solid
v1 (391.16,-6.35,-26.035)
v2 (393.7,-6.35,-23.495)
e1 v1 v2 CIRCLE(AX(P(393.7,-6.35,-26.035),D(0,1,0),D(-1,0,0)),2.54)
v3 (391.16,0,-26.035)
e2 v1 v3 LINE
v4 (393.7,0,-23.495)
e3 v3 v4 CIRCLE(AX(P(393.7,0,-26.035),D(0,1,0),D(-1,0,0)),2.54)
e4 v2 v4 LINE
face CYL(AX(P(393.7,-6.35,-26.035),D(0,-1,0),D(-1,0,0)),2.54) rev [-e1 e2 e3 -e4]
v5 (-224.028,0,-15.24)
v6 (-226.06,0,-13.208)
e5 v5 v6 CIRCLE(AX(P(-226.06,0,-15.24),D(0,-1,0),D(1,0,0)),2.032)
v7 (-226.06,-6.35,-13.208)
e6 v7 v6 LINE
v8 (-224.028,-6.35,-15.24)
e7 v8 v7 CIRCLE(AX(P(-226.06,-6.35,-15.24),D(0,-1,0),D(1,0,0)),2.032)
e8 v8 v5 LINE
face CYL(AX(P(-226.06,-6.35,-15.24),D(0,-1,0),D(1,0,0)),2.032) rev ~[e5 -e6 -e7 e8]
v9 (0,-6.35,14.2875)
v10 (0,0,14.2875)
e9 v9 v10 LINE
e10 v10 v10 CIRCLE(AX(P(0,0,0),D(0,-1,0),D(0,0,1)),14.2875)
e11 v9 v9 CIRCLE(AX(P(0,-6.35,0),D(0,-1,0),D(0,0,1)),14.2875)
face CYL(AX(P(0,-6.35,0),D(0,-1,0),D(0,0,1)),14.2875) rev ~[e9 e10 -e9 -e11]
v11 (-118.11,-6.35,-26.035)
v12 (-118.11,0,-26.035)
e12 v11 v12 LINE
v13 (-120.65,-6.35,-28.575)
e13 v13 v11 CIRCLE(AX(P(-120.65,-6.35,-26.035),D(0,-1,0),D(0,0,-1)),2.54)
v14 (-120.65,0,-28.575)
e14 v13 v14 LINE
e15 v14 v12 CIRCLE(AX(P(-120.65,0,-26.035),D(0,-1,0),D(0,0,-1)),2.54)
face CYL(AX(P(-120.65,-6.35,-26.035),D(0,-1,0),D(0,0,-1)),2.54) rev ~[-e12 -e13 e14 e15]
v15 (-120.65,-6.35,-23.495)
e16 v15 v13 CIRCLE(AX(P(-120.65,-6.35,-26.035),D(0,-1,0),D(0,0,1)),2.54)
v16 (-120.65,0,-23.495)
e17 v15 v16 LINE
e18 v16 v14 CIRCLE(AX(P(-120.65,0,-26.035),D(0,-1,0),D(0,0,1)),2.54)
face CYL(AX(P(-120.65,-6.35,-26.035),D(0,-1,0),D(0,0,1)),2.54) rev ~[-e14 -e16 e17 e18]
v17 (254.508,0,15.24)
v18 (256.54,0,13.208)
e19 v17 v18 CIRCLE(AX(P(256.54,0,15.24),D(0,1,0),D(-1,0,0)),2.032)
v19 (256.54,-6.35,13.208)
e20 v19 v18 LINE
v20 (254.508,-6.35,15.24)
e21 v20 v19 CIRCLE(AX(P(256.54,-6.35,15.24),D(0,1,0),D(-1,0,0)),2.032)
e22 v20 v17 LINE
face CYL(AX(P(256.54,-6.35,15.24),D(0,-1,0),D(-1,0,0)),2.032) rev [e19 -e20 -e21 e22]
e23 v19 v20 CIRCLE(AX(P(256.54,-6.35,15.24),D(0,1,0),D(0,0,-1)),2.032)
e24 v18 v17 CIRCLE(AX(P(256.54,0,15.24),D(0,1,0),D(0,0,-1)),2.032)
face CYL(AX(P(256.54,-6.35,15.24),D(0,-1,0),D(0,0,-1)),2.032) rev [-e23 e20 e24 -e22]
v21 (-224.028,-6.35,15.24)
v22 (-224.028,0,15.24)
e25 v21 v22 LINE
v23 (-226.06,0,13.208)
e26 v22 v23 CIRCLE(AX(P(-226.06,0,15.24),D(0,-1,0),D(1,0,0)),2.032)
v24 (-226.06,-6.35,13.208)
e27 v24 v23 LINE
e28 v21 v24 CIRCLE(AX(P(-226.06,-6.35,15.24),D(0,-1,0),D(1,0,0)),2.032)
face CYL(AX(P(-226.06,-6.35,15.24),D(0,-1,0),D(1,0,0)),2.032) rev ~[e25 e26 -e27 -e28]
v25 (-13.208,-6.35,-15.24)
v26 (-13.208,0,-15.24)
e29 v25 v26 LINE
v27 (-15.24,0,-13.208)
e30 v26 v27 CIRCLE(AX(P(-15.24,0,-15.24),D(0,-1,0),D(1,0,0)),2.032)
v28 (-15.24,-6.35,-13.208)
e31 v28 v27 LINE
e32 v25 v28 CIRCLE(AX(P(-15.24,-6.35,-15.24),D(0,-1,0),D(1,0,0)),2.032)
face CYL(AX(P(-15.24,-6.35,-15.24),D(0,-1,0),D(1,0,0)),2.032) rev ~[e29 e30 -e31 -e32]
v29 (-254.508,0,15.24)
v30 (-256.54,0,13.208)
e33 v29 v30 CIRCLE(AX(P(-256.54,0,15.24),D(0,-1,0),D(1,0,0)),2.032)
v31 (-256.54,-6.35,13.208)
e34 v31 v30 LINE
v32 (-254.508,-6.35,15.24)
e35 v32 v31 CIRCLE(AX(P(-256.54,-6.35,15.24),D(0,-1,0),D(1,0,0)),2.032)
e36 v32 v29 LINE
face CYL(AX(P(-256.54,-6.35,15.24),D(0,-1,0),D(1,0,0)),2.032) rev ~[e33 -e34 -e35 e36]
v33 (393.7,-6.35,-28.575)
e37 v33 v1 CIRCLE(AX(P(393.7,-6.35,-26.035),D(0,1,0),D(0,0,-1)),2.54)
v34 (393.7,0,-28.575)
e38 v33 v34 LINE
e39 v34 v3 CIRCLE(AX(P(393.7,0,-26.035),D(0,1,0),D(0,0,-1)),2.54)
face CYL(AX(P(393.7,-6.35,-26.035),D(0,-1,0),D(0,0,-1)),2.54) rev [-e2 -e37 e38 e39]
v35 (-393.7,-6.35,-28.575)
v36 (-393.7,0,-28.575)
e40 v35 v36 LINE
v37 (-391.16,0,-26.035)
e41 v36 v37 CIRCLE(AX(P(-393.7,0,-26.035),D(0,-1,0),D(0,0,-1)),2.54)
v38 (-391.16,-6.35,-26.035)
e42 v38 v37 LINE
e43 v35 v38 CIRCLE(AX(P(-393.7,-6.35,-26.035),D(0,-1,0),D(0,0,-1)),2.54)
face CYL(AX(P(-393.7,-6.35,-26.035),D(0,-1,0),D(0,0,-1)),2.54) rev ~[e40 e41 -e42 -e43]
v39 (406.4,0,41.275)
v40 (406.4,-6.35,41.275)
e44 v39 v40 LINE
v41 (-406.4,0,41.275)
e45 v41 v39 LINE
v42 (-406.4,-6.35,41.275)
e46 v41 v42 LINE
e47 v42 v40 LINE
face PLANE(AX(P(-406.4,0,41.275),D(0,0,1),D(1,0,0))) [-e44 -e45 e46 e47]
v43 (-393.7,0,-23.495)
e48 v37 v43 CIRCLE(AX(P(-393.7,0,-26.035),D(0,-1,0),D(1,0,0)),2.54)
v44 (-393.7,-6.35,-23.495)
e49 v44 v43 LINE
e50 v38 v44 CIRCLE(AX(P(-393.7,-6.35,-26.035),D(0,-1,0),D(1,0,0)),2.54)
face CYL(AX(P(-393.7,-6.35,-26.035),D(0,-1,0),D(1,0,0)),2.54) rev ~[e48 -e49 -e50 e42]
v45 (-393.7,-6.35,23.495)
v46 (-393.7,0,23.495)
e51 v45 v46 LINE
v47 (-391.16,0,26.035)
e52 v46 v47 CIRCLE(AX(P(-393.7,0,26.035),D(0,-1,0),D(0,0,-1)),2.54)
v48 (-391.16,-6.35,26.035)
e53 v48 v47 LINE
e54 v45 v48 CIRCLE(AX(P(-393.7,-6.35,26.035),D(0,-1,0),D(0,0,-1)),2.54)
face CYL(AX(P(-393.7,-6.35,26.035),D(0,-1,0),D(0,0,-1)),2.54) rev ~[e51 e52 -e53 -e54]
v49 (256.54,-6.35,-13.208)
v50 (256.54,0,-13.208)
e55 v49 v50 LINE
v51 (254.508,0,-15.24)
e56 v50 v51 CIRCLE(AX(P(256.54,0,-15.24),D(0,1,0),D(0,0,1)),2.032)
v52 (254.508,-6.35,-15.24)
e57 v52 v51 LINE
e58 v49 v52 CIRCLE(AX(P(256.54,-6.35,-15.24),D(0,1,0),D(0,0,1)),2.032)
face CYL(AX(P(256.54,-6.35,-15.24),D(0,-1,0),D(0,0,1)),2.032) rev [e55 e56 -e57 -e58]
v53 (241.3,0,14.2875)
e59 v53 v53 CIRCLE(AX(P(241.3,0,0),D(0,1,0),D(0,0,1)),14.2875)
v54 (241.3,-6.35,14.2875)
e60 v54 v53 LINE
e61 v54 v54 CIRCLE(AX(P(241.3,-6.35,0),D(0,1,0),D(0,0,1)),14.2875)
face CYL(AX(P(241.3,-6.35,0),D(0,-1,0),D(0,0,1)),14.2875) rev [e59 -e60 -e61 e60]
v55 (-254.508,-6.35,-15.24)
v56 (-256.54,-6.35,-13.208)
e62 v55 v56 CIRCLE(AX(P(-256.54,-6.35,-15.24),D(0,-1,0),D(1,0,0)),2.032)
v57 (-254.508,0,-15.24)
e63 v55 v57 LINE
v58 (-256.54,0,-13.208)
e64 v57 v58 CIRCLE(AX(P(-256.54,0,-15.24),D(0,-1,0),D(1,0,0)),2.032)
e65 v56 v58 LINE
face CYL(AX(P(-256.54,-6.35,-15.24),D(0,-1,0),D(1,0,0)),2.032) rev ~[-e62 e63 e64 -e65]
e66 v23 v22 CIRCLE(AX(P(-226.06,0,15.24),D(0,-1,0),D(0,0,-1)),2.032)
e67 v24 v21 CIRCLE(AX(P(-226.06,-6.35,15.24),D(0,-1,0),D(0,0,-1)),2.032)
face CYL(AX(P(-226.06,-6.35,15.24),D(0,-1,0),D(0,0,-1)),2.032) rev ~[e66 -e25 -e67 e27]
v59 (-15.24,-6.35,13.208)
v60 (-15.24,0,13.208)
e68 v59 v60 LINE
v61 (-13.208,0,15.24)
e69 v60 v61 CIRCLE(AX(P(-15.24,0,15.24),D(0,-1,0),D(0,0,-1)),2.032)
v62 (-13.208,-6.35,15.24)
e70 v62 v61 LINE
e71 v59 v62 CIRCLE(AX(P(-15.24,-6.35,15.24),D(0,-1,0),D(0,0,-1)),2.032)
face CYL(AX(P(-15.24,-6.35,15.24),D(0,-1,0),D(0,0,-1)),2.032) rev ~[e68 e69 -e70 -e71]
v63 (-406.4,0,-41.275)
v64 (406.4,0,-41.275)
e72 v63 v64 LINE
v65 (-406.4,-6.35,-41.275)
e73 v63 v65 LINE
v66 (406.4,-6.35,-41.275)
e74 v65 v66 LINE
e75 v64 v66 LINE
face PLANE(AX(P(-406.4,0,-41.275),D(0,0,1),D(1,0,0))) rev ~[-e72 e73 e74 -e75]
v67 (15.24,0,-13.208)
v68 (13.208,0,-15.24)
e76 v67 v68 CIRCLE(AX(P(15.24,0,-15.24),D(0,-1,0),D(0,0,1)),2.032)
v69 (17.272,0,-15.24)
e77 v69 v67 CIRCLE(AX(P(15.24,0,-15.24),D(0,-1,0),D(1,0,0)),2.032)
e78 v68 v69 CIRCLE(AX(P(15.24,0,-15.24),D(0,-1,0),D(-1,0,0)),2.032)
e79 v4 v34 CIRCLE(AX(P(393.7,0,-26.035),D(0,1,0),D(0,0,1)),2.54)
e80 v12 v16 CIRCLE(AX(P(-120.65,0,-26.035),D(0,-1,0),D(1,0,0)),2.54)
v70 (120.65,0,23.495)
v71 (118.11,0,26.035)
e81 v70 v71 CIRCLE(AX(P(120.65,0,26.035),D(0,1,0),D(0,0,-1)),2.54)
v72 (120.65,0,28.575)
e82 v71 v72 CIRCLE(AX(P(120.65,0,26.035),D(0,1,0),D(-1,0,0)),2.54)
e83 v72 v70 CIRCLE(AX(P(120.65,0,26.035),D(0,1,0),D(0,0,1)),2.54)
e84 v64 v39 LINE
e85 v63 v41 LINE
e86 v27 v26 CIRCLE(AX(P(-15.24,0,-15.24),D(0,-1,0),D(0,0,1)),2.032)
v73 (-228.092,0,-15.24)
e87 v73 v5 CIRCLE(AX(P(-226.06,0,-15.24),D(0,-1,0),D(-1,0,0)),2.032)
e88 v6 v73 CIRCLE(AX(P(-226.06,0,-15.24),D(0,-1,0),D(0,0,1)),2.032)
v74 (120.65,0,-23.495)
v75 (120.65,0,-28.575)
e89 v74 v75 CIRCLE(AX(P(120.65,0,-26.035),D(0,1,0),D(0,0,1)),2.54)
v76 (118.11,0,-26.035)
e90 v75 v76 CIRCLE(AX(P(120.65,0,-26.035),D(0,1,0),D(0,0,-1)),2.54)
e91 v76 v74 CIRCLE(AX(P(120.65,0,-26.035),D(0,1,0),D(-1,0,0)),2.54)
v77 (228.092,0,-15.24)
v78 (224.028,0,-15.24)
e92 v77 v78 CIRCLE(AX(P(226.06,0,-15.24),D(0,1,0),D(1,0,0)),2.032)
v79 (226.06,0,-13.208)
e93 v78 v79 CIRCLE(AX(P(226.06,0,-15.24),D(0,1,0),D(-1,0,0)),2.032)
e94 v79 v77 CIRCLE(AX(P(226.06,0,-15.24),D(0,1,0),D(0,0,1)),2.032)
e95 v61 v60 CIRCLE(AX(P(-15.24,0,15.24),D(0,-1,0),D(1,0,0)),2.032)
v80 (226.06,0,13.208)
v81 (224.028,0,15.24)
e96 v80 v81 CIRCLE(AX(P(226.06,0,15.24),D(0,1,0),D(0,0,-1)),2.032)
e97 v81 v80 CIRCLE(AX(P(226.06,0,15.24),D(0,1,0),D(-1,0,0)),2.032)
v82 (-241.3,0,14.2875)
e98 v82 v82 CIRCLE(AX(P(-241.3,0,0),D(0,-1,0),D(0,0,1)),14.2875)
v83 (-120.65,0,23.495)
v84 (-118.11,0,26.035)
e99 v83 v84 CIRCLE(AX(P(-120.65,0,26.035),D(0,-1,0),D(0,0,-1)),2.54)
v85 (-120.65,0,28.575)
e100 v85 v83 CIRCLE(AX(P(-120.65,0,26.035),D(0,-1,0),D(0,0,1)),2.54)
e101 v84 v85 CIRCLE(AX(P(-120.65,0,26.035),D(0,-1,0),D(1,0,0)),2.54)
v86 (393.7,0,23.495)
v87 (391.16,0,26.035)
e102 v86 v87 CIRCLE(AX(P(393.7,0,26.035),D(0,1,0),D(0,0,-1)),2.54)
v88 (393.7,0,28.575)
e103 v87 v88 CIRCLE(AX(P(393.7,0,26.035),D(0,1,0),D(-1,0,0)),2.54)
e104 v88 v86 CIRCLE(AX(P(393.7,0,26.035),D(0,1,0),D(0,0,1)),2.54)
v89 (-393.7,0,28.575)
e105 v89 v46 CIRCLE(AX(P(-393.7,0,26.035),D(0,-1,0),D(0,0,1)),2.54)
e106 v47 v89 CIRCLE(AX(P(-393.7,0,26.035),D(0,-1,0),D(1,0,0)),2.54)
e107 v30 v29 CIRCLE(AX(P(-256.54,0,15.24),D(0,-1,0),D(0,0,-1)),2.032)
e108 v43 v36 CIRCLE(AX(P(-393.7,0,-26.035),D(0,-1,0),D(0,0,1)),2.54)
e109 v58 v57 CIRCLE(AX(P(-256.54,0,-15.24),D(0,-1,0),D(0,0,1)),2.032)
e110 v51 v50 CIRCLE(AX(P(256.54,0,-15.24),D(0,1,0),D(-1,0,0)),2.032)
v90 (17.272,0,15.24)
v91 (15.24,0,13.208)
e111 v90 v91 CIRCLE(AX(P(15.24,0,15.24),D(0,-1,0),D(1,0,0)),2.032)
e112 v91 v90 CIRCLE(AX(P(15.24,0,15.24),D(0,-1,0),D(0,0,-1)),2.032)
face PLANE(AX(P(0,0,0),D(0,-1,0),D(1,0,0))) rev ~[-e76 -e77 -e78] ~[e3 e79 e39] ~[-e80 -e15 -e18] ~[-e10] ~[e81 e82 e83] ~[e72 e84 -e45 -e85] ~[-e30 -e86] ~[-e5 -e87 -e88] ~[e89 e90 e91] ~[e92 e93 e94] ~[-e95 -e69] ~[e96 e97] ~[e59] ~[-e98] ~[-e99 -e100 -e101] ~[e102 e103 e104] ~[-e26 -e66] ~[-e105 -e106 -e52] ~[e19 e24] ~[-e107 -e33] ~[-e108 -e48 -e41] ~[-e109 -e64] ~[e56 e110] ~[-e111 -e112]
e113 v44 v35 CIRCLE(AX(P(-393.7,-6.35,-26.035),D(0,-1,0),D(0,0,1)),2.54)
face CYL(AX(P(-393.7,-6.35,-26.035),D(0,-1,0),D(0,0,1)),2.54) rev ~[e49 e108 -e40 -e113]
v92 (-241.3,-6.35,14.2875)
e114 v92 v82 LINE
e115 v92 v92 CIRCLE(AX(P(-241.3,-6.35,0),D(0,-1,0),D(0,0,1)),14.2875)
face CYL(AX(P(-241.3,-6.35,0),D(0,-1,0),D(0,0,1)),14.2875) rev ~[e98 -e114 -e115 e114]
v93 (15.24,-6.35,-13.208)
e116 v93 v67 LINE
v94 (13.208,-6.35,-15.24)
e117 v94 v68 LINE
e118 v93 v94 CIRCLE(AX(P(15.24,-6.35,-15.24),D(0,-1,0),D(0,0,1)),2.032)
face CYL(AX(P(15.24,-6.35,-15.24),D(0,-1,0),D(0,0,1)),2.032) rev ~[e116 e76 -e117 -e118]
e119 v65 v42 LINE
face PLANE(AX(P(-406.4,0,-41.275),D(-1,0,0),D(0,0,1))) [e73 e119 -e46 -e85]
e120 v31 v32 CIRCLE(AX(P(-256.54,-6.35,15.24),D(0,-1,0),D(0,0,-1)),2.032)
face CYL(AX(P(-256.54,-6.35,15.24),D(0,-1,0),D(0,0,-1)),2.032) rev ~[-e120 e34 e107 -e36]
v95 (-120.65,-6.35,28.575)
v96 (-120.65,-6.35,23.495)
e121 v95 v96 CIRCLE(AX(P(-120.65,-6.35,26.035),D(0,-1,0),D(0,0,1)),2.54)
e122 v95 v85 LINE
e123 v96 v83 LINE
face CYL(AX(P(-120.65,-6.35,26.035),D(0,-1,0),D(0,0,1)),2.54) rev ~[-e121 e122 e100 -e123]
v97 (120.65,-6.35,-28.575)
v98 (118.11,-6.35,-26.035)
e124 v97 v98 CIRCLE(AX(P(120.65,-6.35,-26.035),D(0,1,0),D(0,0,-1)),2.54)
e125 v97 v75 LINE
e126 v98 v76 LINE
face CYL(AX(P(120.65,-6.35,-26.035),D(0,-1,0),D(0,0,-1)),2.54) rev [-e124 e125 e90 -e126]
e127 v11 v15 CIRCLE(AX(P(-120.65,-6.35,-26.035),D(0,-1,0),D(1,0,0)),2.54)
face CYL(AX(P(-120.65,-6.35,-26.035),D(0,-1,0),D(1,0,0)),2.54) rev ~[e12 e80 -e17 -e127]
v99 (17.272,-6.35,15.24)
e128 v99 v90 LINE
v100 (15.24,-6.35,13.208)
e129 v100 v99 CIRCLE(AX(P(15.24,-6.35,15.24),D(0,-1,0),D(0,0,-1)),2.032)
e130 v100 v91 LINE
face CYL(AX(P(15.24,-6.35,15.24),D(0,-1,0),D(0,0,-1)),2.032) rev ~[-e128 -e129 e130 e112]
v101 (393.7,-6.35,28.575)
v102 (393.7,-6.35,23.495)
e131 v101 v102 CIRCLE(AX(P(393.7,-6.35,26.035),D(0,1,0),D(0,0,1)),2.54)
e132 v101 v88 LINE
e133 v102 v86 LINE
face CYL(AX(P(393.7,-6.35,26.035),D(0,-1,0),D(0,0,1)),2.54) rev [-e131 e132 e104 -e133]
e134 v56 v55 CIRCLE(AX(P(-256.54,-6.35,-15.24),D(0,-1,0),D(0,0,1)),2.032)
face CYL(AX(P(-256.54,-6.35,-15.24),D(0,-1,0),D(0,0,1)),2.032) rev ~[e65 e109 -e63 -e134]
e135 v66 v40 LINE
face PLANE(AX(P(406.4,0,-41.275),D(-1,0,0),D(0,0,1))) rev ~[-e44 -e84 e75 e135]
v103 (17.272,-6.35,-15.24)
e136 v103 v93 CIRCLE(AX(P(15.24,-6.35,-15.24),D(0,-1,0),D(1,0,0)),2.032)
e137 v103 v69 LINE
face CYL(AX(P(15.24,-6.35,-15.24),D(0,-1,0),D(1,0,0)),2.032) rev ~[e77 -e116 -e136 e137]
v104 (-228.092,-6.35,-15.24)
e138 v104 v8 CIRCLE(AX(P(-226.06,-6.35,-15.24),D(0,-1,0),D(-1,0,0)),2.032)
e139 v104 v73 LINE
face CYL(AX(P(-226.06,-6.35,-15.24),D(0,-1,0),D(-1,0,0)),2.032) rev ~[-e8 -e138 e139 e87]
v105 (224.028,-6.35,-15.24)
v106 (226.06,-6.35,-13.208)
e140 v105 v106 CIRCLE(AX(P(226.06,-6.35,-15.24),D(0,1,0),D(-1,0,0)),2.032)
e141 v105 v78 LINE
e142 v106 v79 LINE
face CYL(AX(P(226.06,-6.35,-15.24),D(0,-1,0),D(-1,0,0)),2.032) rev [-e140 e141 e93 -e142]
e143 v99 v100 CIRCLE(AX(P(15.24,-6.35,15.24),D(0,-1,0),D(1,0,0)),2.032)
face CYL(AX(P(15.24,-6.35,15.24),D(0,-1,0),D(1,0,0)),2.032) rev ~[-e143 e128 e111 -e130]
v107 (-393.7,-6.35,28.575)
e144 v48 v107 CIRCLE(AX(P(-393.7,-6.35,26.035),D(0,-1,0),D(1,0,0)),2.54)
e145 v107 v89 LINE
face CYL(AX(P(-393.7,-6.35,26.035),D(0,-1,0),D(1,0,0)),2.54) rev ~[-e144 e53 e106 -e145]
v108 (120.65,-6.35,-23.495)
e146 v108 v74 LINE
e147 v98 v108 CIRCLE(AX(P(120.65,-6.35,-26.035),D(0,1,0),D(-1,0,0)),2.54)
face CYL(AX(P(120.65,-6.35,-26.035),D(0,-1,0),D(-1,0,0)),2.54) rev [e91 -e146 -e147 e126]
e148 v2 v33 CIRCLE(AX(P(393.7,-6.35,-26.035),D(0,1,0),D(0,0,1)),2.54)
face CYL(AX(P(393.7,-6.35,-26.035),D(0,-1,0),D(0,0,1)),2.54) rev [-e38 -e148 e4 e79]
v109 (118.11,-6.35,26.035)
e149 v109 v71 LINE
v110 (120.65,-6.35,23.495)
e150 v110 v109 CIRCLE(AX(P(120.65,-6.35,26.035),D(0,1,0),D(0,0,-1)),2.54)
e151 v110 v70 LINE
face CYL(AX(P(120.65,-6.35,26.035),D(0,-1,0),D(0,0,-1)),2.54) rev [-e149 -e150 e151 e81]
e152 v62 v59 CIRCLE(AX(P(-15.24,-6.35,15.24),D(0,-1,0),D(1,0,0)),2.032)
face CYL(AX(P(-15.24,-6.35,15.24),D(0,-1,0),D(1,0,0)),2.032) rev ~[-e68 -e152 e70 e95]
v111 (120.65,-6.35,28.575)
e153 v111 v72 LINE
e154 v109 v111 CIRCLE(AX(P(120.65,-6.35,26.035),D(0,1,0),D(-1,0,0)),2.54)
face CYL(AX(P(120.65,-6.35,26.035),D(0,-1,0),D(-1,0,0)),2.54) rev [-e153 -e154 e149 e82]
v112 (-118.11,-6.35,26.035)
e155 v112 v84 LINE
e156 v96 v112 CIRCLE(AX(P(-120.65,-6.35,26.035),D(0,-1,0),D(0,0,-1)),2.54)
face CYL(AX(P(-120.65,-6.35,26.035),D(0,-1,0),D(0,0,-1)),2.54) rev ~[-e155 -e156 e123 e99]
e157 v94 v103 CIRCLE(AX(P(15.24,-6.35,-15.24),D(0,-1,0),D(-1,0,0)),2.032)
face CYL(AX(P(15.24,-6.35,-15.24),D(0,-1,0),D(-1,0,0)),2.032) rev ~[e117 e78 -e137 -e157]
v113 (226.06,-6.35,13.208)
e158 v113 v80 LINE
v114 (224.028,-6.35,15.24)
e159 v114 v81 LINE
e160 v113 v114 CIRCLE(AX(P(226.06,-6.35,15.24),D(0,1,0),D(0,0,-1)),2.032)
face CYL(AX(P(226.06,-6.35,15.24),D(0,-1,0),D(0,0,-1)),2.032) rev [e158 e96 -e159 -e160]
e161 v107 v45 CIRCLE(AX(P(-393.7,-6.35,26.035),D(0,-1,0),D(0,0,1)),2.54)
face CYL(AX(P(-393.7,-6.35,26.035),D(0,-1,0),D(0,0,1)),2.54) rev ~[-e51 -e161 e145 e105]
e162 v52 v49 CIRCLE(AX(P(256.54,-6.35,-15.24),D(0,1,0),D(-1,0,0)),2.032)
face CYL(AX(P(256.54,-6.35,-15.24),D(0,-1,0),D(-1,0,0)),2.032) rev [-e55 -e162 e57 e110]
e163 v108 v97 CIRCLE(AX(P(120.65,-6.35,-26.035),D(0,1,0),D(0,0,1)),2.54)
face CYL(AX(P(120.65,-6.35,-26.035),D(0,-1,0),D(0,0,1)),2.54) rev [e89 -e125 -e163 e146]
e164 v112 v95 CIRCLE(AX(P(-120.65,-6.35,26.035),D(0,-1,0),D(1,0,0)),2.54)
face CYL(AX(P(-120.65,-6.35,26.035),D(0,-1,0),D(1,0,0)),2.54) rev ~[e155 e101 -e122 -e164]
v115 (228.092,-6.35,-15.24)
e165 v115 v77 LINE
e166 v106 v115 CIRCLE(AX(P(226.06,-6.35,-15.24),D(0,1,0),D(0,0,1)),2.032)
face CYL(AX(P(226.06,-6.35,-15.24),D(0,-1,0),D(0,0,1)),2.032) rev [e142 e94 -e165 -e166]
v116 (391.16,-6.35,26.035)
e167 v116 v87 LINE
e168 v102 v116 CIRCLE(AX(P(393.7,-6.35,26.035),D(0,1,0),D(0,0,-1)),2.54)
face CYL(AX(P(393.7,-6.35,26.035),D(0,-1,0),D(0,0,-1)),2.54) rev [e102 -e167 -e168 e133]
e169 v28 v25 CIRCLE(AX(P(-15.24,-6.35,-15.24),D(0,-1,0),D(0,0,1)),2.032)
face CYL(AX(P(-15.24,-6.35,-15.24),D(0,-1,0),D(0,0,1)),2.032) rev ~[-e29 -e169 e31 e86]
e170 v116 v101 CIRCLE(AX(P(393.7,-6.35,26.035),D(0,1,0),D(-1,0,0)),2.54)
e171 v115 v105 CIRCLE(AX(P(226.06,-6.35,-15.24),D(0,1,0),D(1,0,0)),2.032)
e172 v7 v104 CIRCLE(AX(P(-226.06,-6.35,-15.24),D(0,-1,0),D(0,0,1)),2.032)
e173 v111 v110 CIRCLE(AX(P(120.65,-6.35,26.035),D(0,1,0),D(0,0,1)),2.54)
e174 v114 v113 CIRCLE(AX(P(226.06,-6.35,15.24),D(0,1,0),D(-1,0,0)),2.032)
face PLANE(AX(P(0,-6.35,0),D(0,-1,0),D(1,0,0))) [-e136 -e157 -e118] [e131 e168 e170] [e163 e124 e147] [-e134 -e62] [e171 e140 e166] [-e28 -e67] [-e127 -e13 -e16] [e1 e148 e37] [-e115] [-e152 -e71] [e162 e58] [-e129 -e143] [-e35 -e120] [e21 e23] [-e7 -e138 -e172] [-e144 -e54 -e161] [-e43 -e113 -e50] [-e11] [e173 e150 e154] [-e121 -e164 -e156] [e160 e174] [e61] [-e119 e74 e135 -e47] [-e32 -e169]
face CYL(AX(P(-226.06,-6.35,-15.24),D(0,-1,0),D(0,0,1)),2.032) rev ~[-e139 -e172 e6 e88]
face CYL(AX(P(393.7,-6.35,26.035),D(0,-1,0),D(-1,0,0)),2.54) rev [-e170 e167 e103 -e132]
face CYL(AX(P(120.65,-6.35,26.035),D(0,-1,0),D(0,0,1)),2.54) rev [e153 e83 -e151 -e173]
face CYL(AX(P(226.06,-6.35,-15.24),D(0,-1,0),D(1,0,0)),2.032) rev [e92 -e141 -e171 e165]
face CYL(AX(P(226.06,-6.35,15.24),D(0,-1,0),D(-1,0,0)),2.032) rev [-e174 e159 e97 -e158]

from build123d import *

# Parameters (mm, degrees)
F0_W     = 812.8
F0_H     = 82.55
F1_DEPTH = 6.35
F3_DEPTH = 6.35
F5_DEPTH = 6.35


# Not quite as in the source:
# - a pattern or mirror of a feature is missing from the dataset's text; its kind, count and spacing are read off the source's solid


with BuildPart() as f1:
    # F0 (on Front) → F1 (new body)
    with BuildSketch(Plane.XZ):
        Rectangle(F0_W, F0_H)
    extrude(amount=F1_DEPTH)

    # F2 (on face) → F3 (cut, through all)
    with BuildSketch(Plane.XZ.offset(6.35)):
        with BuildLine():
            ThreePointArc((-254.508, 15.24), (-257.9768409794, 16.6768409794), (-256.54, 13.208))
            Line((-256.54, 13.208), (-256.54, 15.24))
            Line((-256.54, 15.24), (-254.508, 15.24))
        make_face()
        with BuildLine():
            Line((-256.54, 15.24), (-256.54, 13.208))
            ThreePointArc((-256.54, 13.208), (-255.1031590206, 13.8031590206), (-254.508, 15.24))
            Line((-254.508, 15.24), (-256.54, 15.24))
        make_face()
        with BuildLine():
            Line((-241.3, 0), (-255.5875, 0))
            ThreePointArc((-255.5875, 0), (-241.3, -14.2875), (-227.0125, 0))
            ThreePointArc((-227.0125, 0), (-231.1972118638, 10.1027881362), (-241.3, 14.2875))
            Line((-241.3, 14.2875), (-241.3, 0))
        make_face()
        with BuildLine():
            ThreePointArc((-241.3, 14.2875), (-251.4027881362, 10.1027881362), (-255.5875, 0))
            Line((-255.5875, 0), (-241.3, 0))
            Line((-241.3, 0), (-241.3, 14.2875))
        make_face()
        with BuildLine():
            Line((-256.54, -15.24), (-256.54, -13.208))
            ThreePointArc((-256.54, -13.208), (-257.9768409794, -16.6768409794), (-254.508, -15.24))
            Line((-254.508, -15.24), (-256.54, -15.24))
        make_face()
        with BuildLine():
            ThreePointArc((-254.508, -15.24), (-255.1031590206, -13.8031590206), (-256.54, -13.208))
            Line((-256.54, -13.208), (-256.54, -15.24))
            Line((-256.54, -15.24), (-254.508, -15.24))
        make_face()
        with BuildLine():
            Line((-226.06, -15.24), (-228.092, -15.24))
            ThreePointArc((-228.092, -15.24), (-226.06, -17.272), (-224.028, -15.24))
            ThreePointArc((-224.028, -15.24), (-224.6231590206, -13.8031590206), (-226.06, -13.208))
            Line((-226.06, -13.208), (-226.06, -15.24))
        make_face()
        with BuildLine():
            ThreePointArc((-226.06, -13.208), (-227.4968409794, -13.8031590206), (-228.092, -15.24))
            Line((-228.092, -15.24), (-226.06, -15.24))
            Line((-226.06, -15.24), (-226.06, -13.208))
        make_face()
        with BuildLine():
            ThreePointArc((-224.028, 15.24), (-227.4968409794, 16.6768409794), (-226.06, 13.208))
            ThreePointArc((-226.06, 13.208), (-224.6231590206, 13.8031590206), (-224.028, 15.24))
        make_face()
        with BuildLine():
            ThreePointArc((14.2875, 0), (10.1027881362, 10.1027881362), (0, 14.2875))
            ThreePointArc((0, 14.2875), (-10.1027881362, -10.1027881362), (14.2875, 0))
        make_face()
        with BuildLine():
            Line((15.24, -15.24), (13.208, -15.24))
            ThreePointArc((13.208, -15.24), (15.24, -17.272), (17.272, -15.24))
            ThreePointArc((17.272, -15.24), (16.6768409794, -13.8031590206), (15.24, -13.208))
            Line((15.24, -13.208), (15.24, -15.24))
        make_face()
        with BuildLine():
            ThreePointArc((15.24, -13.208), (13.8031590206, -13.8031590206), (13.208, -15.24))
            Line((13.208, -15.24), (15.24, -15.24))
            Line((15.24, -15.24), (15.24, -13.208))
        make_face()
        with BuildLine():
            ThreePointArc((17.272, 15.24), (13.8031590206, 16.6768409794), (15.24, 13.208))
            ThreePointArc((15.24, 13.208), (16.6768409794, 13.8031590206), (17.272, 15.24))
        make_face()
        with BuildLine():
            Line((-15.24, 15.24), (-13.208, 15.24))
            ThreePointArc((-13.208, 15.24), (-16.6768409794, 16.6768409794), (-15.24, 13.208))
            Line((-15.24, 13.208), (-15.24, 15.24))
        make_face()
        with BuildLine():
            ThreePointArc((-15.24, 13.208), (-13.8031590206, 13.8031590206), (-13.208, 15.24))
            Line((-13.208, 15.24), (-15.24, 15.24))
            Line((-15.24, 15.24), (-15.24, 13.208))
        make_face()
        with BuildLine():
            Line((-15.24, -15.24), (-15.24, -13.208))
            ThreePointArc((-15.24, -13.208), (-16.6768409794, -16.6768409794), (-13.208, -15.24))
            Line((-13.208, -15.24), (-15.24, -15.24))
        make_face()
        with BuildLine():
            ThreePointArc((-13.208, -15.24), (-13.8031590206, -13.8031590206), (-15.24, -13.208))
            Line((-15.24, -13.208), (-15.24, -15.24))
            Line((-15.24, -15.24), (-13.208, -15.24))
        make_face()
    f3 = extrude(amount=-F3_DEPTH, mode=Mode.SUBTRACT)

    # F3_copies: F3 across plane
    add(f3.mirror(Plane(origin=(120.65, 0, 0), x_dir=(0, 0, 1), z_dir=(1, 0, 0))), mode=Mode.SUBTRACT)

    # F4 (on face) → F5 (cut, through all)
    with BuildSketch(Plane.XZ.offset(6.35)):
        with BuildLine():
            ThreePointArc((-391.16, 26.035), (-391.9039487758, 27.8310512242), (-393.7, 28.575))
            Line((-393.7, 28.575), (-393.7, 23.495))
            ThreePointArc((-393.7, 23.495), (-391.9039487758, 24.2389487758), (-391.16, 26.035))
        make_face()
        with BuildLine():
            ThreePointArc((-391.16, -26.035), (-391.9039487758, -24.2389487758), (-393.7, -23.495))
            Line((-393.7, -23.495), (-393.7, -28.575))
            ThreePointArc((-393.7, -28.575), (-391.9039487758, -27.8310512242), (-391.16, -26.035))
        make_face()
        with BuildLine():
            Line((-393.7, -28.575), (-393.7, -23.495))
            ThreePointArc((-393.7, -23.495), (-396.24, -26.035), (-393.7, -28.575))
        make_face()
        with BuildLine():
            Line((-393.7, 23.495), (-393.7, 28.575))
            ThreePointArc((-393.7, 28.575), (-396.24, 26.035), (-393.7, 23.495))
        make_face()
        with BuildLine():
            ThreePointArc((-118.11, 26.035), (-118.8539487758, 27.8310512242), (-120.65, 28.575))
            Line((-120.65, 28.575), (-120.65, 23.495))
            ThreePointArc((-120.65, 23.495), (-118.8539487758, 24.2389487758), (-118.11, 26.035))
        make_face()
        with BuildLine():
            ThreePointArc((-118.11, -26.035), (-118.8539487758, -24.2389487758), (-120.65, -23.495))
            Line((-120.65, -23.495), (-120.65, -28.575))
            ThreePointArc((-120.65, -28.575), (-118.8539487758, -27.8310512242), (-118.11, -26.035))
        make_face()
        with BuildLine():
            Line((-120.65, -28.575), (-120.65, -23.495))
            ThreePointArc((-120.65, -23.495), (-123.19, -26.035), (-120.65, -28.575))
        make_face()
        with BuildLine():
            Line((-120.65, 23.495), (-120.65, 28.575))
            ThreePointArc((-120.65, 28.575), (-123.19, 26.035), (-120.65, 23.495))
        make_face()
    f5 = extrude(amount=-F5_DEPTH, mode=Mode.SUBTRACT)

    # F5_copies: F5 across plane
    add(f5.mirror(Plane(origin=(0, 0, 0), x_dir=(0, 0, 1), z_dir=(1, 0, 0))), mode=Mode.SUBTRACT)


solid = f1.part
